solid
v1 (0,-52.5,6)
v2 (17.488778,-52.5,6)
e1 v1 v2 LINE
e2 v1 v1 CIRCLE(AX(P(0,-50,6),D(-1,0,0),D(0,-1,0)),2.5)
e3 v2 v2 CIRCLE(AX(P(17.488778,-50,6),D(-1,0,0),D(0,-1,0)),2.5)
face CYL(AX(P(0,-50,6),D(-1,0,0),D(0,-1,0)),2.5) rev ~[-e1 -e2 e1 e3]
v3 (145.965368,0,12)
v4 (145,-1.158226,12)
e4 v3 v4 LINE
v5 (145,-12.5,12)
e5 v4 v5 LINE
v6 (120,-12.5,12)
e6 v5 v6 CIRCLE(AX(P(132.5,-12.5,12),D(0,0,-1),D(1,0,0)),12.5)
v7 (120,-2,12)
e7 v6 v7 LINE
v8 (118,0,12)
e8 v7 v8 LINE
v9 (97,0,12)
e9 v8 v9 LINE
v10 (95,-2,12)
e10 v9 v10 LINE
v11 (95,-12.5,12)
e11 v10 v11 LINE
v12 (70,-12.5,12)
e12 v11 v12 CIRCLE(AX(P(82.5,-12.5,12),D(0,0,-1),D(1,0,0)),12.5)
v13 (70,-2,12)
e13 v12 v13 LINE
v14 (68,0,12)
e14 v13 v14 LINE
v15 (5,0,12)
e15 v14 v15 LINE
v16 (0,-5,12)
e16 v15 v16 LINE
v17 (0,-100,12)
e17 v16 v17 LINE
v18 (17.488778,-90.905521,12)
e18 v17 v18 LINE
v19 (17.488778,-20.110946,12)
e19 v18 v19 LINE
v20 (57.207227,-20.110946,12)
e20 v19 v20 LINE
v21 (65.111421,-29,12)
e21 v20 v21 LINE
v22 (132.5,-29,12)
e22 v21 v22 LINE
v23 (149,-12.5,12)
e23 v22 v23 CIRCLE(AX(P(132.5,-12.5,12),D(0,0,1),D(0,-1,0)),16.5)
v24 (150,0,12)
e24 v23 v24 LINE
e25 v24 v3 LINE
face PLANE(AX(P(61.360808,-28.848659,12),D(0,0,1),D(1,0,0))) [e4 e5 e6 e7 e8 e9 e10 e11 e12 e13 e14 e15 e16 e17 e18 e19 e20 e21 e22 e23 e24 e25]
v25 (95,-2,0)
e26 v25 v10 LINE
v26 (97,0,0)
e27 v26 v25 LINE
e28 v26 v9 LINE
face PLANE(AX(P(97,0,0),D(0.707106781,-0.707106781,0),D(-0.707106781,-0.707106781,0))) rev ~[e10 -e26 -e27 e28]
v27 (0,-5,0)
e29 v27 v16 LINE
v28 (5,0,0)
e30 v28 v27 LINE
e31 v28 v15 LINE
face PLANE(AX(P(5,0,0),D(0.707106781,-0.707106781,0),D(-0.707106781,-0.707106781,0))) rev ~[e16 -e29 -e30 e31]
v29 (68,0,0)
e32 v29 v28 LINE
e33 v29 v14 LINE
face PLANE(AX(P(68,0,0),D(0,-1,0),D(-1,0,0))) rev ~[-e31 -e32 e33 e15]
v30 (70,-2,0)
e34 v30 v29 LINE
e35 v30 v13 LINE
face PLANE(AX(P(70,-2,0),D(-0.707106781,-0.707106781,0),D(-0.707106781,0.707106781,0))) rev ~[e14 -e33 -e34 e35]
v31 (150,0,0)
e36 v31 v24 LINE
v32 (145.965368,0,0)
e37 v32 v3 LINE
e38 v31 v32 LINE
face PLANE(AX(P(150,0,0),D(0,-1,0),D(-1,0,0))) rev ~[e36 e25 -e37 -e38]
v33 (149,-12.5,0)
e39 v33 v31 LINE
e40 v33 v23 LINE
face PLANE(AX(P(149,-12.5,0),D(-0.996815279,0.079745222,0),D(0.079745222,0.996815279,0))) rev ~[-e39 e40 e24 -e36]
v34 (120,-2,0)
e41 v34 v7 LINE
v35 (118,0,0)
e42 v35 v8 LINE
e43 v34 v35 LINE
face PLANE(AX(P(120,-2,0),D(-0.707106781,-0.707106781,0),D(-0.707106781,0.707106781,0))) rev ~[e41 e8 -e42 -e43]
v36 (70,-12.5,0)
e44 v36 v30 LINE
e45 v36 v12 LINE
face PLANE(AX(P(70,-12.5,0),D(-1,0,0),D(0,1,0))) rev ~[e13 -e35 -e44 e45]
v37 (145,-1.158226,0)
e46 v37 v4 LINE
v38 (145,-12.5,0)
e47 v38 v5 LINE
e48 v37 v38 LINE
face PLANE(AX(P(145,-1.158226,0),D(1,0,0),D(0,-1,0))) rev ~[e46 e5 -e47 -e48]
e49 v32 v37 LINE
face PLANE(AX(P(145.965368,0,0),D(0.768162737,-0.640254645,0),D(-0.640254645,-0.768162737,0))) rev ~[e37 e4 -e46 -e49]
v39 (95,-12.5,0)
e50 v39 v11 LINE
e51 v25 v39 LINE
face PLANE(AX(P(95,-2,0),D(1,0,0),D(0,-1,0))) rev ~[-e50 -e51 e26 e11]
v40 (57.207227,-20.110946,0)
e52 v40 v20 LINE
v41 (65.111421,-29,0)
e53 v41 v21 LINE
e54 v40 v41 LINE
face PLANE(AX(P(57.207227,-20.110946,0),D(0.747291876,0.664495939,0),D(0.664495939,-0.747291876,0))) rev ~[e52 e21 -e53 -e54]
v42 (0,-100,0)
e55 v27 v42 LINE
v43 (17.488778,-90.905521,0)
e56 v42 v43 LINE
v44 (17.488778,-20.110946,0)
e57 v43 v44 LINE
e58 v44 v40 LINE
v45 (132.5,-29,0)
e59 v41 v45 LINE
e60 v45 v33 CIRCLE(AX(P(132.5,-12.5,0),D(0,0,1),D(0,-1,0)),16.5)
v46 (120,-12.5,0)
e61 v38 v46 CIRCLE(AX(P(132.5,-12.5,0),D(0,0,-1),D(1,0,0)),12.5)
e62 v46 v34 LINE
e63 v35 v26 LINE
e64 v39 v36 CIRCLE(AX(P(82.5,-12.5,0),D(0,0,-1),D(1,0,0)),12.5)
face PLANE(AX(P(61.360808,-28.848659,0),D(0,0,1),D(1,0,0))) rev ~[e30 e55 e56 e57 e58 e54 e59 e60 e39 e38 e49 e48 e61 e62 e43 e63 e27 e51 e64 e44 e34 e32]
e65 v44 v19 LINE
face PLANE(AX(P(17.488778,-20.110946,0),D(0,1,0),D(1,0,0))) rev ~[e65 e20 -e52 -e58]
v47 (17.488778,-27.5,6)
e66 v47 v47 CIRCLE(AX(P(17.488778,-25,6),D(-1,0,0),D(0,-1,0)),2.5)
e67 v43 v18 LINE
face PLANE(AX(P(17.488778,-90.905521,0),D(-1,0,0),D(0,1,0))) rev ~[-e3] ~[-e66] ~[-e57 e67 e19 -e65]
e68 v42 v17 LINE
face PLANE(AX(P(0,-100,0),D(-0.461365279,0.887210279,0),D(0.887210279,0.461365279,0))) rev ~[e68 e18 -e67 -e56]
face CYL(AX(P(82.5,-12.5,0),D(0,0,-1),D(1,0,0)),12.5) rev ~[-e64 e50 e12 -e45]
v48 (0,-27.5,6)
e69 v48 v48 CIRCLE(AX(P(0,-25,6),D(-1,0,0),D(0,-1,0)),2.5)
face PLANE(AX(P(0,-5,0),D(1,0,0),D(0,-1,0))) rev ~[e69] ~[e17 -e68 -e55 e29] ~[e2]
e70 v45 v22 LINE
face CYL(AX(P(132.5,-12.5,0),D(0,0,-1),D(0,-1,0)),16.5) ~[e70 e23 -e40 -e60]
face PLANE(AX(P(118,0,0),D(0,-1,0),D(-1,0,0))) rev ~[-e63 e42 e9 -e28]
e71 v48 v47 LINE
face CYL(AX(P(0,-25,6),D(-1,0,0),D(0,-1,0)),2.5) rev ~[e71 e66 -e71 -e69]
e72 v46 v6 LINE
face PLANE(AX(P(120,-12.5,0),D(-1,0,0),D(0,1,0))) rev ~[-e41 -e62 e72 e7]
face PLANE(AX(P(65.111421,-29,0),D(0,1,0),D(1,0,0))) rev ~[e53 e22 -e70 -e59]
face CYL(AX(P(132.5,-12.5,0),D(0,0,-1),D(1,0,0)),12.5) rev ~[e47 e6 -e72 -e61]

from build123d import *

# Parameters (mm, degrees)
F1_DEPTH = 12
F2_DEPTH = 25
F3_R     = 2.5
F4_DEPTH = 25


# Not quite as in the source:
# - a feature names something its author has since deleted; it is built from what else it names


with BuildPart() as f1:
    # F0 (on Top) → F1 (new body)
    with BuildSketch(Plane.XY):
        with BuildLine():
            Line((5, 0), (0, -5))
            Line((0, -5), (0, -30))
            Line((0, -30), (0, -35))
            Line((0, -35), (0, -60))
            Line((0, -60), (0, -65))
            Line((0, -65), (0, -100))
            Line((0, -100), (17.4887780242, -90.9055213439))
            Line((17.4887780242, -90.9055213439), (17.4887780242, -46.2056212127))
            Line((17.4887780242, -46.2056212127), (17.4887780242, -29))
            Line((17.4887780242, -29), (17.4887780242, -20.1109461486))
            Line((17.4887780242, -20.1109461486), (57.2072267532, -20.1109461486))
            Line((57.2072267532, -20.1109461486), (65.1114210486, -29))
            Line((65.1114210486, -29), (132.5, -29))
            ThreePointArc((132.5, -29), (144.1672618896, -24.1672618896), (149, -12.5))
            Line((149, -12.5), (150, 0))
            Line((150, 0), (145.9653675556, 0))
            Line((145.9653675556, 0), (145, -1.1582256993))
            Line((145, -1.1582256993), (145, -3.3333333333))
            Line((145, -3.3333333333), (145, -12.5))
            ThreePointArc((145, -12.5), (132.5, -25), (120, -12.5))
            Line((120, -12.5), (120, -2))
            Line((120, -2), (118, 0))
            Line((118, 0), (97, 0))
            Line((97, 0), (95, -2))
            Line((95, -2), (95, -12.5))
            ThreePointArc((95, -12.5), (82.5, -25), (70, -12.5))
            Line((70, -12.5), (70, -2))
            Line((70, -2), (68, 0))
            Line((68, 0), (5, 0))
        make_face()
    extrude(amount=F1_DEPTH)

    # F0 (on Top) → F2 (cut)
    with BuildSketch(Plane.XY):
        Polygon((17.4887780242, -46.2056212127), (17.4887780242, -90.9055213439), (27.4864036634, -85.7065764627), (108.4292656183, -38.1771444678), (132.5, -29), (65.1114210486, -29), (57.2072267532, -29), (57.2072267532, -46.2056212127), align=None)
    extrude(amount=-F2_DEPTH, mode=Mode.SUBTRACT)

    # F3 (on face) → F4 (cut)
    with BuildSketch(Plane(origin=(0, 0, 0), x_dir=(0, -1, 0), z_dir=(-1, 0, 0))):
        with Locations((25, 6)):
            Circle(F3_R)
        with Locations((50, 6)):
            Circle(F3_R)
    extrude(amount=-F4_DEPTH, mode=Mode.SUBTRACT)


solid = f1.part
